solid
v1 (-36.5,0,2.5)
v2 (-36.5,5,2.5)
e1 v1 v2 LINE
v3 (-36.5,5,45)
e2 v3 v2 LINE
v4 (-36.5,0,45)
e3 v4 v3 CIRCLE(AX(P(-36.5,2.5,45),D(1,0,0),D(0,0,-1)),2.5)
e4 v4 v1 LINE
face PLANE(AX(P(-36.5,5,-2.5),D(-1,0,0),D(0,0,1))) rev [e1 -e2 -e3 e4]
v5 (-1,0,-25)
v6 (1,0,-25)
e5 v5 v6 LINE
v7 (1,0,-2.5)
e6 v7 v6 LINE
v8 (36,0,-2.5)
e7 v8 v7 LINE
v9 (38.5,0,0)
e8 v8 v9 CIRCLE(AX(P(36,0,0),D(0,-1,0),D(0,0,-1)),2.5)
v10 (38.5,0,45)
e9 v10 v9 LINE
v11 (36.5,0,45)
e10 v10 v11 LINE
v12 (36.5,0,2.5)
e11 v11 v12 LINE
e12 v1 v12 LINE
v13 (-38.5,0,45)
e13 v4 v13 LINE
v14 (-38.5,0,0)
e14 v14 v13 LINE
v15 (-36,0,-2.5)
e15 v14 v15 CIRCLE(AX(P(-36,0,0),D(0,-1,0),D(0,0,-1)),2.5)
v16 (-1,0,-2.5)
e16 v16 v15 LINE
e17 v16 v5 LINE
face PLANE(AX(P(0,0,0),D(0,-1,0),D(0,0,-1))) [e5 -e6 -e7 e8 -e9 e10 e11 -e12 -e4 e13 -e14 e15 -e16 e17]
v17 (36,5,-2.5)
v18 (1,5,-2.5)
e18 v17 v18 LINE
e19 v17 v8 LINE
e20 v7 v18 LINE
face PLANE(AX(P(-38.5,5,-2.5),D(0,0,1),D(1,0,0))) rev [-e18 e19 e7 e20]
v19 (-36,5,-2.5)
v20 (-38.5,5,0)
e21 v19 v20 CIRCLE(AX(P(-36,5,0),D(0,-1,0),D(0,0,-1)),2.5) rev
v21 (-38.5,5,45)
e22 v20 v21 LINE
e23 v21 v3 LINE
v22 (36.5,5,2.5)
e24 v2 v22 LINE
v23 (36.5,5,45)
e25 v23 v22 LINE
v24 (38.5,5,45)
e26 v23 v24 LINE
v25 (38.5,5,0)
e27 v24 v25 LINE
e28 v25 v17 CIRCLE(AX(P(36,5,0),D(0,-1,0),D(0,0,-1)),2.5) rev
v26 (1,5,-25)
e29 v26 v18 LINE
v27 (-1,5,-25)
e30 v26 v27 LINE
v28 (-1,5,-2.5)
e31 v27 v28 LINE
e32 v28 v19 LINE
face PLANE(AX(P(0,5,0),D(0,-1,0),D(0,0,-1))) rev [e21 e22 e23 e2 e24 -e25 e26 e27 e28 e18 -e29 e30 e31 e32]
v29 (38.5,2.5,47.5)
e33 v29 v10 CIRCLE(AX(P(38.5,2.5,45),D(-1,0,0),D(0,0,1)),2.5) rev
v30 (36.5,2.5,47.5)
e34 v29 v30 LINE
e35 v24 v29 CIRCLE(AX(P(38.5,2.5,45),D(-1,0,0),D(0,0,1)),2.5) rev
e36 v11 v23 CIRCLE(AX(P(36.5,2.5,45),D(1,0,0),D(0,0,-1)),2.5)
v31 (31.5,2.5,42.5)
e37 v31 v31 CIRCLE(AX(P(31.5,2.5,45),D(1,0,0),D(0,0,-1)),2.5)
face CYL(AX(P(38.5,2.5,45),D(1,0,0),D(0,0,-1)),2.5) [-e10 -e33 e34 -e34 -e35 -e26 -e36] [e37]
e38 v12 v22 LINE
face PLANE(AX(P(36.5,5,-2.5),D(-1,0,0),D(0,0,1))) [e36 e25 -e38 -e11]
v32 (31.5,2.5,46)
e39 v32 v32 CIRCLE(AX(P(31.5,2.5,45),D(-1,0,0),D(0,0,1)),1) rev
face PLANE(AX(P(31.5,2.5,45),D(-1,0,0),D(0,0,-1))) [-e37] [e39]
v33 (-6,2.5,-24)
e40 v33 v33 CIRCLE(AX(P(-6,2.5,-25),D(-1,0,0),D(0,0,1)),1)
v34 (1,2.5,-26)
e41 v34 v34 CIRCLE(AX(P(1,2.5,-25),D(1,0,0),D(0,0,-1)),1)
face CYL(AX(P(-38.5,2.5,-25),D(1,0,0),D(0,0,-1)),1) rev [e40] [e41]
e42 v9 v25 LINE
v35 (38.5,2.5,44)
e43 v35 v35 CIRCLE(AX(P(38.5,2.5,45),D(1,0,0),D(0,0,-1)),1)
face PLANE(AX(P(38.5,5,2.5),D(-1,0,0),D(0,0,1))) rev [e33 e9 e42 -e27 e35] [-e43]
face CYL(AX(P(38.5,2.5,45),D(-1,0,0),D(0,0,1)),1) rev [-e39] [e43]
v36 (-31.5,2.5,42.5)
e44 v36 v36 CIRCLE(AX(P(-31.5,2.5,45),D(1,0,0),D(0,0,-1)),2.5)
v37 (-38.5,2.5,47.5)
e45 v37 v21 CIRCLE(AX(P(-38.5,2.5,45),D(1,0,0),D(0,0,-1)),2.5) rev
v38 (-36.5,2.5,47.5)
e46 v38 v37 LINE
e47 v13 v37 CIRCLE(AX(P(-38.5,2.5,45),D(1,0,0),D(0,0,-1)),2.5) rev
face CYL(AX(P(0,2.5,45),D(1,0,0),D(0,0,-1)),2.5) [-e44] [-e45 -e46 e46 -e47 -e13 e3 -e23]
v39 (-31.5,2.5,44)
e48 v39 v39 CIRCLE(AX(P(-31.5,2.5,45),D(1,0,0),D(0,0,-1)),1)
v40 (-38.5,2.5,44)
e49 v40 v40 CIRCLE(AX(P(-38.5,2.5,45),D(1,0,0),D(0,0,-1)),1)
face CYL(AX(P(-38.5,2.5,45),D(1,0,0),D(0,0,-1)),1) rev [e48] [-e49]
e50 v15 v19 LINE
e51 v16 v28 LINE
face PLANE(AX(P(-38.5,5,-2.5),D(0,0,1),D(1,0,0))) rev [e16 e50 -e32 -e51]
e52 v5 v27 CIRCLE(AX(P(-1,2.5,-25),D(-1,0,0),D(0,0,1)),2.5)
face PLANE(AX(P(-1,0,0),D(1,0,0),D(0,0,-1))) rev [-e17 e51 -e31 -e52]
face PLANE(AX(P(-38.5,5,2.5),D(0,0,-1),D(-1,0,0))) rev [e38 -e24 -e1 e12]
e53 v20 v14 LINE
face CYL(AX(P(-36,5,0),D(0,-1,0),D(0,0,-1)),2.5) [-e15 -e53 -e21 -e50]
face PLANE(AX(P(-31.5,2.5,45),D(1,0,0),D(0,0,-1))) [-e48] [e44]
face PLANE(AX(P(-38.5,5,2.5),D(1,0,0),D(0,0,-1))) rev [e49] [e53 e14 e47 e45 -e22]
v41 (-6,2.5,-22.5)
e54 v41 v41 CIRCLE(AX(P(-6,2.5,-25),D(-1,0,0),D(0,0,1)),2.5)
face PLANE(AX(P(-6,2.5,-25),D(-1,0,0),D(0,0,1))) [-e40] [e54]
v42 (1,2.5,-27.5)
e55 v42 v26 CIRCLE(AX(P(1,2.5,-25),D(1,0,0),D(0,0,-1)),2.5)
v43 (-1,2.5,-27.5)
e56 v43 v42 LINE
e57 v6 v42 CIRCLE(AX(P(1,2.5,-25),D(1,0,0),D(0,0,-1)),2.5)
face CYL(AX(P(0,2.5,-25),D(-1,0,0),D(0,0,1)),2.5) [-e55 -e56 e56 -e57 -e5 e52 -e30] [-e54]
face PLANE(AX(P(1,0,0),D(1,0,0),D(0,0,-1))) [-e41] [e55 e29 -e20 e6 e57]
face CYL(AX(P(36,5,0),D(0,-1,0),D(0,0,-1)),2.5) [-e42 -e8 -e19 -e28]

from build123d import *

# Parameters (mm, degrees)
ESBO_O1_W                  = 77
ESBO_O1_H                  = 5
RESSALTO_EXTRUS_O1_DEPTH   = 5
ESBO_O2_W                  = 2
ESBO_O2_H                  = 50
RESSALTO_EXTRUS_O2_DEPTH   = 5
FILETE1_R                  = 2.5
ESBO_O7_R                  = 2.5
RESSALTO_EXTRUS_O5_DEPTH   = 5
ESBO_O3_R                  = 1
CORTE_EXTRUS_O1_DEPTH      = 62.347371582
FILETE1_OF_ESPELHAR1_R     = 2.5
FILETE2_R                  = 2.5
ESBO_O4_W                  = 30
ESBO_O4_H                  = 5
RESSALTO_EXTRUS_O3_DEPTH   = 1
FILETE3_R                  = 2.5
ESBO_O6_R                  = 2.5
RESSALTO_EXTRUS_O4_DEPTH   = 5
CORTE_EXTRUS_O2_DEPTH      = 62.347371582
CORTE_EXTRUS_O2_DEPTH_BACK = 62.347371582
ESBO_O5_R                  = 1


with BuildPart() as part:
    # Esboço1 → Ressalto-extrusão1 (new body)
    with BuildSketch(Plane(origin=(0, 0, 0), x_dir=(1, 0, 0), z_dir=(0, 1, 0))):
        Rectangle(ESBO_O1_W, ESBO_O1_H)
    extrude(amount=RESSALTO_EXTRUS_O1_DEPTH)

    # Esboço2 → Ressalto-extrusão2 (add)
    with BuildSketch(Plane(origin=(0, 0, 0), x_dir=(1, 0, 0), z_dir=(0, 1, 0))):
        with Locations((-37.5, -22.5)):
            Rectangle(ESBO_O2_W, ESBO_O2_H)
    ressalto_extrus_o2 = extrude(amount=RESSALTO_EXTRUS_O2_DEPTH)

    # Filete1
    filete1_edges = [part.edges().sort_by_distance(p)[0] for p in [
        (-37.5, 0, 47.5),
        (-37.5, 5, 47.5),
    ]]
    fillet(filete1_edges, radius=FILETE1_R - 0.0001)  # a hair under: the kernel refuses the full size

    # Esboço7 → Ressalto-extrusão5 (add)
    with BuildSketch(Plane(origin=(-36.5, 0, 0), x_dir=(0, 0, -1), z_dir=(1, 0, 0))):
        with Locations((-45, 2.5)):
            Circle(ESBO_O7_R)
    ressalto_extrus_o5 = extrude(amount=RESSALTO_EXTRUS_O5_DEPTH)

    # Esboço3 → Corte-extrusão1 (cut, through all)
    with BuildSketch(Plane(origin=(0, 0, 0), x_dir=(0, 0, -1), z_dir=(1, 0, 0))):
        with Locations((-45, 2.5)):
            Circle(ESBO_O3_R)
    corte_extrus_o1 = extrude(amount=-CORTE_EXTRUS_O1_DEPTH, mode=Mode.SUBTRACT)

    # Espelhar1: Ressalto-extrusão2, Ressalto-extrusão5, Corte-extrusão1 across plane
    add(ressalto_extrus_o2.mirror(Plane(origin=(0, 0, 0), x_dir=(0, 0, 1), z_dir=(1, 0, 0))))
    add(ressalto_extrus_o5.mirror(Plane(origin=(0, 0, 0), x_dir=(0, 0, 1), z_dir=(1, 0, 0))))
    add(corte_extrus_o1.mirror(Plane(origin=(0, 0, 0), x_dir=(0, 0, 1), z_dir=(1, 0, 0))), mode=Mode.SUBTRACT)

    # Filete1 of Espelhar1
    filete1_of_espelhar1_edges = [part.edges().sort_by_distance(p)[0] for p in [
        (37.5, 0, 47.5),
        (37.5, 5, 47.5),
    ]]
    fillet(filete1_of_espelhar1_edges, radius=FILETE1_OF_ESPELHAR1_R - 0.0001)  # a hair under: the kernel refuses the full size

    # Filete2
    filete2_edges = [part.edges().sort_by_distance(p)[0] for p in [
        (-38.5, 2.5, -2.5),
        (38.5, 2.5, -2.5),
    ]]
    fillet(filete2_edges, radius=FILETE2_R)

    # Esboço4 → Ressalto-extrusão3 (add, symmetric)
    with BuildSketch(Plane(origin=(0, 0, 0), x_dir=(0, 0, -1), z_dir=(1, 0, 0))):
        with Locations((12.5, 2.5)):
            Rectangle(ESBO_O4_W, ESBO_O4_H)
    extrude(amount=RESSALTO_EXTRUS_O3_DEPTH, both=True)

    # Filete3
    filete3_edges = [part.edges().sort_by_distance(p)[0] for p in [
        (0, 5, -27.5),
        (0, 0, -27.5),
    ]]
    fillet(filete3_edges, radius=FILETE3_R - 0.0001)  # a hair under: the kernel refuses the full size

    # Esboço6 → Ressalto-extrusão4 (add)
    with BuildSketch(Plane.ZY.offset(1)):
        with Locations((-25, 2.5)):
            Circle(ESBO_O6_R)
    extrude(amount=RESSALTO_EXTRUS_O4_DEPTH)

    # Esboço5 → Corte-extrusão2 (cut, two sides: drawn at the far end of the back side and taken through both)
    with BuildSketch(Plane(origin=(0, 0, 0), x_dir=(0, 0, -1), z_dir=(1, 0, 0)).offset(-CORTE_EXTRUS_O2_DEPTH_BACK)):
        with Locations((25, 2.5)):
            Circle(ESBO_O5_R)
    extrude(amount=CORTE_EXTRUS_O2_DEPTH + CORTE_EXTRUS_O2_DEPTH_BACK, mode=Mode.SUBTRACT)


solid = part.part
